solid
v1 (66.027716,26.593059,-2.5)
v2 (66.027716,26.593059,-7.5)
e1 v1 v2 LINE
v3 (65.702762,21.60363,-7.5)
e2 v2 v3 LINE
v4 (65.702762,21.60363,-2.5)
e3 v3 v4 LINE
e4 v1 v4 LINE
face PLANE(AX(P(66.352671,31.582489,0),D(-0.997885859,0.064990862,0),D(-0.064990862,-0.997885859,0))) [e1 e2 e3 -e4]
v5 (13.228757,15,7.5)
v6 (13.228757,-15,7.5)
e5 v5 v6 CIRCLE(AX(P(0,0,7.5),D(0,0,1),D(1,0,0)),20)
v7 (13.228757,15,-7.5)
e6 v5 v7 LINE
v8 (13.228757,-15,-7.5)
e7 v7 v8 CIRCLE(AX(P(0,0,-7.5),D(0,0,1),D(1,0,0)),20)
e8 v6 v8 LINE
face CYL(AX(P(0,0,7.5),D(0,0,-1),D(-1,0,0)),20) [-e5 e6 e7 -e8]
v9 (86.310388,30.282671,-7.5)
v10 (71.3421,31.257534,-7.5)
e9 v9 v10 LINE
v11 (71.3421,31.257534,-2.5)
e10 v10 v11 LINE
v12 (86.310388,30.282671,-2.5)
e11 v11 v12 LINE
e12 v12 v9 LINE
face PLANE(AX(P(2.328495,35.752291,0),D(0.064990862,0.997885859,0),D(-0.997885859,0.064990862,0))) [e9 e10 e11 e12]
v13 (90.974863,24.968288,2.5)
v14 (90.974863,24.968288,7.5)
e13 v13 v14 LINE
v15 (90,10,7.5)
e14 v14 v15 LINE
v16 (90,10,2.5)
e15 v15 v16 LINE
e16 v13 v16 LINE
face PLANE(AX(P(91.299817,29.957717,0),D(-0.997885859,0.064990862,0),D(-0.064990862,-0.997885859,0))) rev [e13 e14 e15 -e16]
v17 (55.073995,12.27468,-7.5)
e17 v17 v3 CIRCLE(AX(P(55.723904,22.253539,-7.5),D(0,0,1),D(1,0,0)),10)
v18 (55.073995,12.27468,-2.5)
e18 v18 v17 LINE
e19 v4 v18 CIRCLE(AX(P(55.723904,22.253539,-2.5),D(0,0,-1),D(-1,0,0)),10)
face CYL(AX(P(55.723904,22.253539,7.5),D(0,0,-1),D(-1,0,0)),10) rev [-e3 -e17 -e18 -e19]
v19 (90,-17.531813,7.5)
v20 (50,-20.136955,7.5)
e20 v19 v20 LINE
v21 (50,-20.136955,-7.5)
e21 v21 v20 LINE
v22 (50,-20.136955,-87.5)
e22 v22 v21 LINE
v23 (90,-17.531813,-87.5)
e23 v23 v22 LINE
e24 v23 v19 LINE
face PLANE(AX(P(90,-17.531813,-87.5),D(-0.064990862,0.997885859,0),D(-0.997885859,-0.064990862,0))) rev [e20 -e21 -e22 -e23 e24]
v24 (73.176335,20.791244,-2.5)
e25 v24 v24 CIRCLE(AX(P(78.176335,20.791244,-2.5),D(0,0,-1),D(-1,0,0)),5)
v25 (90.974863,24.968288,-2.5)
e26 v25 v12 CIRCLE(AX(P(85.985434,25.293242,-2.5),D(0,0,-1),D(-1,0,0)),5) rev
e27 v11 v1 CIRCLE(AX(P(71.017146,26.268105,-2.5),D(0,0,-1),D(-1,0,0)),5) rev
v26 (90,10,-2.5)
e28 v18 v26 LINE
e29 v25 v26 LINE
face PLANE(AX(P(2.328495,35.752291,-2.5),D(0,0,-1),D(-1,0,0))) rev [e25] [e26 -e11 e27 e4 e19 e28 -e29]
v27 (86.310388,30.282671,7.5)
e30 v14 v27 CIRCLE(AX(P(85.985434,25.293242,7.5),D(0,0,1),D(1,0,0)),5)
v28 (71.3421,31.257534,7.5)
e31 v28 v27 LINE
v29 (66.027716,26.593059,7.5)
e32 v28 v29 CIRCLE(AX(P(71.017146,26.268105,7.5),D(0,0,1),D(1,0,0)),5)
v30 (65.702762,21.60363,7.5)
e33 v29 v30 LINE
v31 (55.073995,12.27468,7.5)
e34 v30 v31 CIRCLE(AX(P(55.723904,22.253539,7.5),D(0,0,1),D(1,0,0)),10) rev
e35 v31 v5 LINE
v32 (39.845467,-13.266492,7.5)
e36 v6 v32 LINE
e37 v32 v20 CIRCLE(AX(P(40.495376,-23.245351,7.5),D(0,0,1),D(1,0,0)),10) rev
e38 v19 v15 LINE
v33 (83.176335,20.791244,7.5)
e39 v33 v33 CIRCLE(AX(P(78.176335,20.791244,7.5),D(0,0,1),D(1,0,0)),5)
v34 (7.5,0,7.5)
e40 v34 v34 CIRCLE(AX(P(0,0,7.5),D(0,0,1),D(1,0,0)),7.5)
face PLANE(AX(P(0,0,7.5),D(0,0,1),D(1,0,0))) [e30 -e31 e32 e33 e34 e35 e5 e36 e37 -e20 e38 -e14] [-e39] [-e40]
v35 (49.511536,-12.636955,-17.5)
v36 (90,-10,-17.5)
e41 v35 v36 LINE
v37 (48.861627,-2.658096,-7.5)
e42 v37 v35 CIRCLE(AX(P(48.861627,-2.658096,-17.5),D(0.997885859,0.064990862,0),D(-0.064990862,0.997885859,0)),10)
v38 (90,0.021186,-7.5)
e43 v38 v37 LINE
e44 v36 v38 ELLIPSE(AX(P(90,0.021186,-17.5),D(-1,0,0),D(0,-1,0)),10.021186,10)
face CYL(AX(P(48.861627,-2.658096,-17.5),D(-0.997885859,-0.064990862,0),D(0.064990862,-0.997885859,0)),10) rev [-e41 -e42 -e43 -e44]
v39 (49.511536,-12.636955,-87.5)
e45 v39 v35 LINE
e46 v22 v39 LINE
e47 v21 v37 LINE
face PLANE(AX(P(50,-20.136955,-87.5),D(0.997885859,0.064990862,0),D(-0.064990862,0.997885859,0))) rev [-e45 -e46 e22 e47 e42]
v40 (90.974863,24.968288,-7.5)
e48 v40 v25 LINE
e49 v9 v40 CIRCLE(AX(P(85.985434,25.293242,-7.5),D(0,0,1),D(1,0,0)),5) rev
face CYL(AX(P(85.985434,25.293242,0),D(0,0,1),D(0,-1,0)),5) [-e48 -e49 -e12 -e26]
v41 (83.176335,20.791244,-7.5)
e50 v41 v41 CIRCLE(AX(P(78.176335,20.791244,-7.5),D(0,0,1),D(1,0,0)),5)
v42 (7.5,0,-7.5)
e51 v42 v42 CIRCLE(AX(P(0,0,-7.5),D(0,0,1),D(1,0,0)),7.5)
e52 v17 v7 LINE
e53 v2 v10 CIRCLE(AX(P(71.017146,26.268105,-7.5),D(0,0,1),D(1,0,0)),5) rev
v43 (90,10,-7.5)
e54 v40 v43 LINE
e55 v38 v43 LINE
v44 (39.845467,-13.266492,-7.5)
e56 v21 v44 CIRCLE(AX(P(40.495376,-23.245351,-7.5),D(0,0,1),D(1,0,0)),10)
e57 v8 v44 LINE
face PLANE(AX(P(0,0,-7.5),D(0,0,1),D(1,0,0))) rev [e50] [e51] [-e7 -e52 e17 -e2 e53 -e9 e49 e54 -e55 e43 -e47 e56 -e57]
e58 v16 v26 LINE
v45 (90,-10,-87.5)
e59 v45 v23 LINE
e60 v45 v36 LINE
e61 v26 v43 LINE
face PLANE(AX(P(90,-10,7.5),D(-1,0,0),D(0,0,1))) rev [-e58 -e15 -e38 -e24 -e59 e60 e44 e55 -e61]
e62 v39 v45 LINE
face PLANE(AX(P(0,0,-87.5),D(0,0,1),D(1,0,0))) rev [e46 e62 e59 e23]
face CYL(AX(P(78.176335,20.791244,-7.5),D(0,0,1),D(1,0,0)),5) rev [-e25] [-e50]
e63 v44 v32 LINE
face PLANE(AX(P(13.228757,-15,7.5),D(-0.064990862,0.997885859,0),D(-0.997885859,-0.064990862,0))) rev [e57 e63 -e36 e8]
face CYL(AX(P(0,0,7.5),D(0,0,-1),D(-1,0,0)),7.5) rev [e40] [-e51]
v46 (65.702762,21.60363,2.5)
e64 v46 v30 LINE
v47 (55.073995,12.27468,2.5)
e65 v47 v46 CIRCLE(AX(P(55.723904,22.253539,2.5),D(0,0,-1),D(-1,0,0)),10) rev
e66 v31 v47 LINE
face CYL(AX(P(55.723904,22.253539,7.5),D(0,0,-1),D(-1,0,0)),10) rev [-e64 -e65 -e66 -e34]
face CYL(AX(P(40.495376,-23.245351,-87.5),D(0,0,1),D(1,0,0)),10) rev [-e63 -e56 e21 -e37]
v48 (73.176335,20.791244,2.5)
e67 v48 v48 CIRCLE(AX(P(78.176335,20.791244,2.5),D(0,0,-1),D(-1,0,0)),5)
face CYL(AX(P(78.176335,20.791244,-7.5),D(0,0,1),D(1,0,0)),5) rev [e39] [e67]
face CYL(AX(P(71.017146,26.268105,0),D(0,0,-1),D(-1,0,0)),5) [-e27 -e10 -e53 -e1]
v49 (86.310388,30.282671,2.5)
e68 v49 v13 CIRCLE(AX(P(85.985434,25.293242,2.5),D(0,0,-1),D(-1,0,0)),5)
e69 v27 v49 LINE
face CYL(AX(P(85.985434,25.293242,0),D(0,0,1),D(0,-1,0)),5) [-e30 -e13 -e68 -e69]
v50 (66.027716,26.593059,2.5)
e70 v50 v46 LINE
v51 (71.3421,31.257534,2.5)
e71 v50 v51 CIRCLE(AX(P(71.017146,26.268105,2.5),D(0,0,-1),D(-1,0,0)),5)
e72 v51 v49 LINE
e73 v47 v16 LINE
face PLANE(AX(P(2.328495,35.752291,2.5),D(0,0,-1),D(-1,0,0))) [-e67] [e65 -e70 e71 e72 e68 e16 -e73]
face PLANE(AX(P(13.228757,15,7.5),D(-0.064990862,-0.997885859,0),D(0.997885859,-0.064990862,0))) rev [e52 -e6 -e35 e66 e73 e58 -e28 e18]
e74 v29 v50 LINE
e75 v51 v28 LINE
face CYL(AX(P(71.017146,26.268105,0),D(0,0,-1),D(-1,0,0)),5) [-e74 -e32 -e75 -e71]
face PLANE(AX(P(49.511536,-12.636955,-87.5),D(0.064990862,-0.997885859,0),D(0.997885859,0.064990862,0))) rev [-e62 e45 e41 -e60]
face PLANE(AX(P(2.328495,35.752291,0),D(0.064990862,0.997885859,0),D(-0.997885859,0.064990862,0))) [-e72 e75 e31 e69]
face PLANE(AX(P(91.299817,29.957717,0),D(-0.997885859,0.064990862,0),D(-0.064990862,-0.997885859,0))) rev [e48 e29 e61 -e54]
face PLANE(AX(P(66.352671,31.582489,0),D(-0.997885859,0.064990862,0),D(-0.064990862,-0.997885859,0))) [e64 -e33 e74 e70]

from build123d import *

# Parameters (mm, degrees)
SKETCH1_R                       = 20
SKETCH1_R_2                     = 7.5
BOSS_EXTRUDE1_DEPTH             = 7.5
BOSS_EXTRUDE2_DEPTH             = 7.5
SKETCH4_W                       = 25
SKETCH4_H                       = 5
BOSS_EXTRUDE3_DEPTH             = 20
SKETCH5_R                       = 5
CUT_EXTRUDE1_DEPTH              = 98.765588134
FILLET1_R                       = 5
FILLET2_R                       = 10
BOSS_EXTRUDE4_REACH             = 99.371
BOSS_EXTRUDE4_DIRECTION_2_DEPTH = 80
FILLET3_R                       = 10
FILLET4_R                       = 10


with BuildPart() as part:
    # Sketch1 → Boss-Extrude1 (new, symmetric)
    with BuildSketch(Plane.XY):
        Circle(SKETCH1_R)
        Circle(SKETCH1_R_2, mode=Mode.SUBTRACT)
    extrude(amount=BOSS_EXTRUDE1_DEPTH, both=True)

    # Sketch2 → Boss-Extrude2 (add, symmetric)
    with BuildSketch(Plane.XY):
        with BuildLine():
            Line((13.228756555, 15), (90, 10))
            Line((90, 10), (90, -10))
            Line((90, -10), (13.228756555, -15))
            ThreePointArc((13.228756555, -15), (20, 0), (13.228756555, 15))
        make_face()
    extrude(amount=BOSS_EXTRUDE2_DEPTH, both=True)

    # Sketch4 → Boss-Extrude3 (add)
    with BuildSketch(Plane(origin=(1.028677717, 15.794573482, 0), x_dir=(0.9978858591262095, -0.06499086209573432, 0), z_dir=(0.06499086209573432, 0.9978858591262095, 0))):
        with Locations((76.6598187, 5)):
            Rectangle(SKETCH4_W, SKETCH4_H)
        with Locations((76.6598187, -5)):
            Rectangle(SKETCH4_W, SKETCH4_H)
    extrude(amount=BOSS_EXTRUDE3_DEPTH)

    # Sketch5 → Cut-Extrude1 (cut, through all)
    with BuildSketch(Plane.XY.offset(7.5)):
        with Locations((78.176335382, 20.791244367)):
            Circle(SKETCH5_R)
    extrude(amount=-CUT_EXTRUDE1_DEPTH, mode=Mode.SUBTRACT)

    # Fillet1
    fillet1_edges = [part.edges().sort_by_distance(p)[0] for p in [
        (66.352670764, 31.582488735, -5),
        (91.299817242, 29.957717183, -5),
        (66.352670764, 31.582488735, 5),
        (91.299817242, 29.957717183, 5),
    ]]
    fillet(fillet1_edges, radius=FILLET1_R)

    # Fillet2
    fillet2_edges = [part.edges().sort_by_distance(p)[0] for p in [
        (65.052853522, 11.624771552, -5),
        (65.052853522, 11.624771552, 5),
    ]]
    fillet(fillet2_edges, radius=FILLET2_R)

    # Boss-Extrude4: up to this face of the body (flat: up to its plane)
    boss_extrude4_end = Plane(part.part.faces().sort_by_distance((38.09502008, 2.657537248, 7.5))[0])
    # Sketch6 → Boss-Extrude4 (add, up to the picked face)
    with BuildSketch(Plane(origin=(0, 0, -7.5), x_dir=(-1, 0, 0), z_dir=(0, 0, -1)), mode=Mode.PRIVATE) as boss_extrude4_sk1:
        Polygon((-90, -10), (-90, -17.531812963), (-50, -20.136955084), (-49.511535852, -12.636955084), align=None)
    boss_extrude4_tool1 = split(extrude(boss_extrude4_sk1.sketch, amount=-BOSS_EXTRUDE4_REACH, mode=Mode.PRIVATE), bisect_by=boss_extrude4_end, keep=Keep.BOTH, mode=Mode.PRIVATE)
    add(boss_extrude4_tool1.solids().sort_by(Axis((69.877637, -15.068829, -7.5), (0, 0, 1)))[0])

    # Sketch6 → Boss-Extrude4 direction 2 (add)
    with BuildSketch(Plane(origin=(0, 0, -7.5), x_dir=(-1, 0, 0), z_dir=(0, 0, -1))):
        Polygon((-90, -10), (-90, -17.531812963), (-50, -20.136955084), (-49.511535852, -12.636955084), align=None)
    extrude(amount=BOSS_EXTRUDE4_DIRECTION_2_DEPTH)

    # Fillet3
    # the kernel refuses this fillet: 10 mm, written as the material it adds along each edge
    with BuildSketch(Plane(origin=(49.511535852, -12.636955084, -7.5), x_dir=(0.06499086209573703, -0.9978858591262094, 0), z_dir=(0, 0, 1))) as fillet3_piece_1:
        with BuildLine():
            CenterArc((10, -9.686547154), FILLET3_R, 104.383505331, 75.616494669)
            Line((0, -9.686547154), (0, 0))
            Line((0, 0), (7.51588965, 0))
        make_face()
    extrude(amount=15)

    # Fillet4
    fillet4_edges = [part.edges().sort_by_distance(p)[0] for p in [
        (69.755767926, -11.318477542, -7.5),
    ]]
    fillet(fillet4_edges, radius=FILLET4_R)


solid = part.part
